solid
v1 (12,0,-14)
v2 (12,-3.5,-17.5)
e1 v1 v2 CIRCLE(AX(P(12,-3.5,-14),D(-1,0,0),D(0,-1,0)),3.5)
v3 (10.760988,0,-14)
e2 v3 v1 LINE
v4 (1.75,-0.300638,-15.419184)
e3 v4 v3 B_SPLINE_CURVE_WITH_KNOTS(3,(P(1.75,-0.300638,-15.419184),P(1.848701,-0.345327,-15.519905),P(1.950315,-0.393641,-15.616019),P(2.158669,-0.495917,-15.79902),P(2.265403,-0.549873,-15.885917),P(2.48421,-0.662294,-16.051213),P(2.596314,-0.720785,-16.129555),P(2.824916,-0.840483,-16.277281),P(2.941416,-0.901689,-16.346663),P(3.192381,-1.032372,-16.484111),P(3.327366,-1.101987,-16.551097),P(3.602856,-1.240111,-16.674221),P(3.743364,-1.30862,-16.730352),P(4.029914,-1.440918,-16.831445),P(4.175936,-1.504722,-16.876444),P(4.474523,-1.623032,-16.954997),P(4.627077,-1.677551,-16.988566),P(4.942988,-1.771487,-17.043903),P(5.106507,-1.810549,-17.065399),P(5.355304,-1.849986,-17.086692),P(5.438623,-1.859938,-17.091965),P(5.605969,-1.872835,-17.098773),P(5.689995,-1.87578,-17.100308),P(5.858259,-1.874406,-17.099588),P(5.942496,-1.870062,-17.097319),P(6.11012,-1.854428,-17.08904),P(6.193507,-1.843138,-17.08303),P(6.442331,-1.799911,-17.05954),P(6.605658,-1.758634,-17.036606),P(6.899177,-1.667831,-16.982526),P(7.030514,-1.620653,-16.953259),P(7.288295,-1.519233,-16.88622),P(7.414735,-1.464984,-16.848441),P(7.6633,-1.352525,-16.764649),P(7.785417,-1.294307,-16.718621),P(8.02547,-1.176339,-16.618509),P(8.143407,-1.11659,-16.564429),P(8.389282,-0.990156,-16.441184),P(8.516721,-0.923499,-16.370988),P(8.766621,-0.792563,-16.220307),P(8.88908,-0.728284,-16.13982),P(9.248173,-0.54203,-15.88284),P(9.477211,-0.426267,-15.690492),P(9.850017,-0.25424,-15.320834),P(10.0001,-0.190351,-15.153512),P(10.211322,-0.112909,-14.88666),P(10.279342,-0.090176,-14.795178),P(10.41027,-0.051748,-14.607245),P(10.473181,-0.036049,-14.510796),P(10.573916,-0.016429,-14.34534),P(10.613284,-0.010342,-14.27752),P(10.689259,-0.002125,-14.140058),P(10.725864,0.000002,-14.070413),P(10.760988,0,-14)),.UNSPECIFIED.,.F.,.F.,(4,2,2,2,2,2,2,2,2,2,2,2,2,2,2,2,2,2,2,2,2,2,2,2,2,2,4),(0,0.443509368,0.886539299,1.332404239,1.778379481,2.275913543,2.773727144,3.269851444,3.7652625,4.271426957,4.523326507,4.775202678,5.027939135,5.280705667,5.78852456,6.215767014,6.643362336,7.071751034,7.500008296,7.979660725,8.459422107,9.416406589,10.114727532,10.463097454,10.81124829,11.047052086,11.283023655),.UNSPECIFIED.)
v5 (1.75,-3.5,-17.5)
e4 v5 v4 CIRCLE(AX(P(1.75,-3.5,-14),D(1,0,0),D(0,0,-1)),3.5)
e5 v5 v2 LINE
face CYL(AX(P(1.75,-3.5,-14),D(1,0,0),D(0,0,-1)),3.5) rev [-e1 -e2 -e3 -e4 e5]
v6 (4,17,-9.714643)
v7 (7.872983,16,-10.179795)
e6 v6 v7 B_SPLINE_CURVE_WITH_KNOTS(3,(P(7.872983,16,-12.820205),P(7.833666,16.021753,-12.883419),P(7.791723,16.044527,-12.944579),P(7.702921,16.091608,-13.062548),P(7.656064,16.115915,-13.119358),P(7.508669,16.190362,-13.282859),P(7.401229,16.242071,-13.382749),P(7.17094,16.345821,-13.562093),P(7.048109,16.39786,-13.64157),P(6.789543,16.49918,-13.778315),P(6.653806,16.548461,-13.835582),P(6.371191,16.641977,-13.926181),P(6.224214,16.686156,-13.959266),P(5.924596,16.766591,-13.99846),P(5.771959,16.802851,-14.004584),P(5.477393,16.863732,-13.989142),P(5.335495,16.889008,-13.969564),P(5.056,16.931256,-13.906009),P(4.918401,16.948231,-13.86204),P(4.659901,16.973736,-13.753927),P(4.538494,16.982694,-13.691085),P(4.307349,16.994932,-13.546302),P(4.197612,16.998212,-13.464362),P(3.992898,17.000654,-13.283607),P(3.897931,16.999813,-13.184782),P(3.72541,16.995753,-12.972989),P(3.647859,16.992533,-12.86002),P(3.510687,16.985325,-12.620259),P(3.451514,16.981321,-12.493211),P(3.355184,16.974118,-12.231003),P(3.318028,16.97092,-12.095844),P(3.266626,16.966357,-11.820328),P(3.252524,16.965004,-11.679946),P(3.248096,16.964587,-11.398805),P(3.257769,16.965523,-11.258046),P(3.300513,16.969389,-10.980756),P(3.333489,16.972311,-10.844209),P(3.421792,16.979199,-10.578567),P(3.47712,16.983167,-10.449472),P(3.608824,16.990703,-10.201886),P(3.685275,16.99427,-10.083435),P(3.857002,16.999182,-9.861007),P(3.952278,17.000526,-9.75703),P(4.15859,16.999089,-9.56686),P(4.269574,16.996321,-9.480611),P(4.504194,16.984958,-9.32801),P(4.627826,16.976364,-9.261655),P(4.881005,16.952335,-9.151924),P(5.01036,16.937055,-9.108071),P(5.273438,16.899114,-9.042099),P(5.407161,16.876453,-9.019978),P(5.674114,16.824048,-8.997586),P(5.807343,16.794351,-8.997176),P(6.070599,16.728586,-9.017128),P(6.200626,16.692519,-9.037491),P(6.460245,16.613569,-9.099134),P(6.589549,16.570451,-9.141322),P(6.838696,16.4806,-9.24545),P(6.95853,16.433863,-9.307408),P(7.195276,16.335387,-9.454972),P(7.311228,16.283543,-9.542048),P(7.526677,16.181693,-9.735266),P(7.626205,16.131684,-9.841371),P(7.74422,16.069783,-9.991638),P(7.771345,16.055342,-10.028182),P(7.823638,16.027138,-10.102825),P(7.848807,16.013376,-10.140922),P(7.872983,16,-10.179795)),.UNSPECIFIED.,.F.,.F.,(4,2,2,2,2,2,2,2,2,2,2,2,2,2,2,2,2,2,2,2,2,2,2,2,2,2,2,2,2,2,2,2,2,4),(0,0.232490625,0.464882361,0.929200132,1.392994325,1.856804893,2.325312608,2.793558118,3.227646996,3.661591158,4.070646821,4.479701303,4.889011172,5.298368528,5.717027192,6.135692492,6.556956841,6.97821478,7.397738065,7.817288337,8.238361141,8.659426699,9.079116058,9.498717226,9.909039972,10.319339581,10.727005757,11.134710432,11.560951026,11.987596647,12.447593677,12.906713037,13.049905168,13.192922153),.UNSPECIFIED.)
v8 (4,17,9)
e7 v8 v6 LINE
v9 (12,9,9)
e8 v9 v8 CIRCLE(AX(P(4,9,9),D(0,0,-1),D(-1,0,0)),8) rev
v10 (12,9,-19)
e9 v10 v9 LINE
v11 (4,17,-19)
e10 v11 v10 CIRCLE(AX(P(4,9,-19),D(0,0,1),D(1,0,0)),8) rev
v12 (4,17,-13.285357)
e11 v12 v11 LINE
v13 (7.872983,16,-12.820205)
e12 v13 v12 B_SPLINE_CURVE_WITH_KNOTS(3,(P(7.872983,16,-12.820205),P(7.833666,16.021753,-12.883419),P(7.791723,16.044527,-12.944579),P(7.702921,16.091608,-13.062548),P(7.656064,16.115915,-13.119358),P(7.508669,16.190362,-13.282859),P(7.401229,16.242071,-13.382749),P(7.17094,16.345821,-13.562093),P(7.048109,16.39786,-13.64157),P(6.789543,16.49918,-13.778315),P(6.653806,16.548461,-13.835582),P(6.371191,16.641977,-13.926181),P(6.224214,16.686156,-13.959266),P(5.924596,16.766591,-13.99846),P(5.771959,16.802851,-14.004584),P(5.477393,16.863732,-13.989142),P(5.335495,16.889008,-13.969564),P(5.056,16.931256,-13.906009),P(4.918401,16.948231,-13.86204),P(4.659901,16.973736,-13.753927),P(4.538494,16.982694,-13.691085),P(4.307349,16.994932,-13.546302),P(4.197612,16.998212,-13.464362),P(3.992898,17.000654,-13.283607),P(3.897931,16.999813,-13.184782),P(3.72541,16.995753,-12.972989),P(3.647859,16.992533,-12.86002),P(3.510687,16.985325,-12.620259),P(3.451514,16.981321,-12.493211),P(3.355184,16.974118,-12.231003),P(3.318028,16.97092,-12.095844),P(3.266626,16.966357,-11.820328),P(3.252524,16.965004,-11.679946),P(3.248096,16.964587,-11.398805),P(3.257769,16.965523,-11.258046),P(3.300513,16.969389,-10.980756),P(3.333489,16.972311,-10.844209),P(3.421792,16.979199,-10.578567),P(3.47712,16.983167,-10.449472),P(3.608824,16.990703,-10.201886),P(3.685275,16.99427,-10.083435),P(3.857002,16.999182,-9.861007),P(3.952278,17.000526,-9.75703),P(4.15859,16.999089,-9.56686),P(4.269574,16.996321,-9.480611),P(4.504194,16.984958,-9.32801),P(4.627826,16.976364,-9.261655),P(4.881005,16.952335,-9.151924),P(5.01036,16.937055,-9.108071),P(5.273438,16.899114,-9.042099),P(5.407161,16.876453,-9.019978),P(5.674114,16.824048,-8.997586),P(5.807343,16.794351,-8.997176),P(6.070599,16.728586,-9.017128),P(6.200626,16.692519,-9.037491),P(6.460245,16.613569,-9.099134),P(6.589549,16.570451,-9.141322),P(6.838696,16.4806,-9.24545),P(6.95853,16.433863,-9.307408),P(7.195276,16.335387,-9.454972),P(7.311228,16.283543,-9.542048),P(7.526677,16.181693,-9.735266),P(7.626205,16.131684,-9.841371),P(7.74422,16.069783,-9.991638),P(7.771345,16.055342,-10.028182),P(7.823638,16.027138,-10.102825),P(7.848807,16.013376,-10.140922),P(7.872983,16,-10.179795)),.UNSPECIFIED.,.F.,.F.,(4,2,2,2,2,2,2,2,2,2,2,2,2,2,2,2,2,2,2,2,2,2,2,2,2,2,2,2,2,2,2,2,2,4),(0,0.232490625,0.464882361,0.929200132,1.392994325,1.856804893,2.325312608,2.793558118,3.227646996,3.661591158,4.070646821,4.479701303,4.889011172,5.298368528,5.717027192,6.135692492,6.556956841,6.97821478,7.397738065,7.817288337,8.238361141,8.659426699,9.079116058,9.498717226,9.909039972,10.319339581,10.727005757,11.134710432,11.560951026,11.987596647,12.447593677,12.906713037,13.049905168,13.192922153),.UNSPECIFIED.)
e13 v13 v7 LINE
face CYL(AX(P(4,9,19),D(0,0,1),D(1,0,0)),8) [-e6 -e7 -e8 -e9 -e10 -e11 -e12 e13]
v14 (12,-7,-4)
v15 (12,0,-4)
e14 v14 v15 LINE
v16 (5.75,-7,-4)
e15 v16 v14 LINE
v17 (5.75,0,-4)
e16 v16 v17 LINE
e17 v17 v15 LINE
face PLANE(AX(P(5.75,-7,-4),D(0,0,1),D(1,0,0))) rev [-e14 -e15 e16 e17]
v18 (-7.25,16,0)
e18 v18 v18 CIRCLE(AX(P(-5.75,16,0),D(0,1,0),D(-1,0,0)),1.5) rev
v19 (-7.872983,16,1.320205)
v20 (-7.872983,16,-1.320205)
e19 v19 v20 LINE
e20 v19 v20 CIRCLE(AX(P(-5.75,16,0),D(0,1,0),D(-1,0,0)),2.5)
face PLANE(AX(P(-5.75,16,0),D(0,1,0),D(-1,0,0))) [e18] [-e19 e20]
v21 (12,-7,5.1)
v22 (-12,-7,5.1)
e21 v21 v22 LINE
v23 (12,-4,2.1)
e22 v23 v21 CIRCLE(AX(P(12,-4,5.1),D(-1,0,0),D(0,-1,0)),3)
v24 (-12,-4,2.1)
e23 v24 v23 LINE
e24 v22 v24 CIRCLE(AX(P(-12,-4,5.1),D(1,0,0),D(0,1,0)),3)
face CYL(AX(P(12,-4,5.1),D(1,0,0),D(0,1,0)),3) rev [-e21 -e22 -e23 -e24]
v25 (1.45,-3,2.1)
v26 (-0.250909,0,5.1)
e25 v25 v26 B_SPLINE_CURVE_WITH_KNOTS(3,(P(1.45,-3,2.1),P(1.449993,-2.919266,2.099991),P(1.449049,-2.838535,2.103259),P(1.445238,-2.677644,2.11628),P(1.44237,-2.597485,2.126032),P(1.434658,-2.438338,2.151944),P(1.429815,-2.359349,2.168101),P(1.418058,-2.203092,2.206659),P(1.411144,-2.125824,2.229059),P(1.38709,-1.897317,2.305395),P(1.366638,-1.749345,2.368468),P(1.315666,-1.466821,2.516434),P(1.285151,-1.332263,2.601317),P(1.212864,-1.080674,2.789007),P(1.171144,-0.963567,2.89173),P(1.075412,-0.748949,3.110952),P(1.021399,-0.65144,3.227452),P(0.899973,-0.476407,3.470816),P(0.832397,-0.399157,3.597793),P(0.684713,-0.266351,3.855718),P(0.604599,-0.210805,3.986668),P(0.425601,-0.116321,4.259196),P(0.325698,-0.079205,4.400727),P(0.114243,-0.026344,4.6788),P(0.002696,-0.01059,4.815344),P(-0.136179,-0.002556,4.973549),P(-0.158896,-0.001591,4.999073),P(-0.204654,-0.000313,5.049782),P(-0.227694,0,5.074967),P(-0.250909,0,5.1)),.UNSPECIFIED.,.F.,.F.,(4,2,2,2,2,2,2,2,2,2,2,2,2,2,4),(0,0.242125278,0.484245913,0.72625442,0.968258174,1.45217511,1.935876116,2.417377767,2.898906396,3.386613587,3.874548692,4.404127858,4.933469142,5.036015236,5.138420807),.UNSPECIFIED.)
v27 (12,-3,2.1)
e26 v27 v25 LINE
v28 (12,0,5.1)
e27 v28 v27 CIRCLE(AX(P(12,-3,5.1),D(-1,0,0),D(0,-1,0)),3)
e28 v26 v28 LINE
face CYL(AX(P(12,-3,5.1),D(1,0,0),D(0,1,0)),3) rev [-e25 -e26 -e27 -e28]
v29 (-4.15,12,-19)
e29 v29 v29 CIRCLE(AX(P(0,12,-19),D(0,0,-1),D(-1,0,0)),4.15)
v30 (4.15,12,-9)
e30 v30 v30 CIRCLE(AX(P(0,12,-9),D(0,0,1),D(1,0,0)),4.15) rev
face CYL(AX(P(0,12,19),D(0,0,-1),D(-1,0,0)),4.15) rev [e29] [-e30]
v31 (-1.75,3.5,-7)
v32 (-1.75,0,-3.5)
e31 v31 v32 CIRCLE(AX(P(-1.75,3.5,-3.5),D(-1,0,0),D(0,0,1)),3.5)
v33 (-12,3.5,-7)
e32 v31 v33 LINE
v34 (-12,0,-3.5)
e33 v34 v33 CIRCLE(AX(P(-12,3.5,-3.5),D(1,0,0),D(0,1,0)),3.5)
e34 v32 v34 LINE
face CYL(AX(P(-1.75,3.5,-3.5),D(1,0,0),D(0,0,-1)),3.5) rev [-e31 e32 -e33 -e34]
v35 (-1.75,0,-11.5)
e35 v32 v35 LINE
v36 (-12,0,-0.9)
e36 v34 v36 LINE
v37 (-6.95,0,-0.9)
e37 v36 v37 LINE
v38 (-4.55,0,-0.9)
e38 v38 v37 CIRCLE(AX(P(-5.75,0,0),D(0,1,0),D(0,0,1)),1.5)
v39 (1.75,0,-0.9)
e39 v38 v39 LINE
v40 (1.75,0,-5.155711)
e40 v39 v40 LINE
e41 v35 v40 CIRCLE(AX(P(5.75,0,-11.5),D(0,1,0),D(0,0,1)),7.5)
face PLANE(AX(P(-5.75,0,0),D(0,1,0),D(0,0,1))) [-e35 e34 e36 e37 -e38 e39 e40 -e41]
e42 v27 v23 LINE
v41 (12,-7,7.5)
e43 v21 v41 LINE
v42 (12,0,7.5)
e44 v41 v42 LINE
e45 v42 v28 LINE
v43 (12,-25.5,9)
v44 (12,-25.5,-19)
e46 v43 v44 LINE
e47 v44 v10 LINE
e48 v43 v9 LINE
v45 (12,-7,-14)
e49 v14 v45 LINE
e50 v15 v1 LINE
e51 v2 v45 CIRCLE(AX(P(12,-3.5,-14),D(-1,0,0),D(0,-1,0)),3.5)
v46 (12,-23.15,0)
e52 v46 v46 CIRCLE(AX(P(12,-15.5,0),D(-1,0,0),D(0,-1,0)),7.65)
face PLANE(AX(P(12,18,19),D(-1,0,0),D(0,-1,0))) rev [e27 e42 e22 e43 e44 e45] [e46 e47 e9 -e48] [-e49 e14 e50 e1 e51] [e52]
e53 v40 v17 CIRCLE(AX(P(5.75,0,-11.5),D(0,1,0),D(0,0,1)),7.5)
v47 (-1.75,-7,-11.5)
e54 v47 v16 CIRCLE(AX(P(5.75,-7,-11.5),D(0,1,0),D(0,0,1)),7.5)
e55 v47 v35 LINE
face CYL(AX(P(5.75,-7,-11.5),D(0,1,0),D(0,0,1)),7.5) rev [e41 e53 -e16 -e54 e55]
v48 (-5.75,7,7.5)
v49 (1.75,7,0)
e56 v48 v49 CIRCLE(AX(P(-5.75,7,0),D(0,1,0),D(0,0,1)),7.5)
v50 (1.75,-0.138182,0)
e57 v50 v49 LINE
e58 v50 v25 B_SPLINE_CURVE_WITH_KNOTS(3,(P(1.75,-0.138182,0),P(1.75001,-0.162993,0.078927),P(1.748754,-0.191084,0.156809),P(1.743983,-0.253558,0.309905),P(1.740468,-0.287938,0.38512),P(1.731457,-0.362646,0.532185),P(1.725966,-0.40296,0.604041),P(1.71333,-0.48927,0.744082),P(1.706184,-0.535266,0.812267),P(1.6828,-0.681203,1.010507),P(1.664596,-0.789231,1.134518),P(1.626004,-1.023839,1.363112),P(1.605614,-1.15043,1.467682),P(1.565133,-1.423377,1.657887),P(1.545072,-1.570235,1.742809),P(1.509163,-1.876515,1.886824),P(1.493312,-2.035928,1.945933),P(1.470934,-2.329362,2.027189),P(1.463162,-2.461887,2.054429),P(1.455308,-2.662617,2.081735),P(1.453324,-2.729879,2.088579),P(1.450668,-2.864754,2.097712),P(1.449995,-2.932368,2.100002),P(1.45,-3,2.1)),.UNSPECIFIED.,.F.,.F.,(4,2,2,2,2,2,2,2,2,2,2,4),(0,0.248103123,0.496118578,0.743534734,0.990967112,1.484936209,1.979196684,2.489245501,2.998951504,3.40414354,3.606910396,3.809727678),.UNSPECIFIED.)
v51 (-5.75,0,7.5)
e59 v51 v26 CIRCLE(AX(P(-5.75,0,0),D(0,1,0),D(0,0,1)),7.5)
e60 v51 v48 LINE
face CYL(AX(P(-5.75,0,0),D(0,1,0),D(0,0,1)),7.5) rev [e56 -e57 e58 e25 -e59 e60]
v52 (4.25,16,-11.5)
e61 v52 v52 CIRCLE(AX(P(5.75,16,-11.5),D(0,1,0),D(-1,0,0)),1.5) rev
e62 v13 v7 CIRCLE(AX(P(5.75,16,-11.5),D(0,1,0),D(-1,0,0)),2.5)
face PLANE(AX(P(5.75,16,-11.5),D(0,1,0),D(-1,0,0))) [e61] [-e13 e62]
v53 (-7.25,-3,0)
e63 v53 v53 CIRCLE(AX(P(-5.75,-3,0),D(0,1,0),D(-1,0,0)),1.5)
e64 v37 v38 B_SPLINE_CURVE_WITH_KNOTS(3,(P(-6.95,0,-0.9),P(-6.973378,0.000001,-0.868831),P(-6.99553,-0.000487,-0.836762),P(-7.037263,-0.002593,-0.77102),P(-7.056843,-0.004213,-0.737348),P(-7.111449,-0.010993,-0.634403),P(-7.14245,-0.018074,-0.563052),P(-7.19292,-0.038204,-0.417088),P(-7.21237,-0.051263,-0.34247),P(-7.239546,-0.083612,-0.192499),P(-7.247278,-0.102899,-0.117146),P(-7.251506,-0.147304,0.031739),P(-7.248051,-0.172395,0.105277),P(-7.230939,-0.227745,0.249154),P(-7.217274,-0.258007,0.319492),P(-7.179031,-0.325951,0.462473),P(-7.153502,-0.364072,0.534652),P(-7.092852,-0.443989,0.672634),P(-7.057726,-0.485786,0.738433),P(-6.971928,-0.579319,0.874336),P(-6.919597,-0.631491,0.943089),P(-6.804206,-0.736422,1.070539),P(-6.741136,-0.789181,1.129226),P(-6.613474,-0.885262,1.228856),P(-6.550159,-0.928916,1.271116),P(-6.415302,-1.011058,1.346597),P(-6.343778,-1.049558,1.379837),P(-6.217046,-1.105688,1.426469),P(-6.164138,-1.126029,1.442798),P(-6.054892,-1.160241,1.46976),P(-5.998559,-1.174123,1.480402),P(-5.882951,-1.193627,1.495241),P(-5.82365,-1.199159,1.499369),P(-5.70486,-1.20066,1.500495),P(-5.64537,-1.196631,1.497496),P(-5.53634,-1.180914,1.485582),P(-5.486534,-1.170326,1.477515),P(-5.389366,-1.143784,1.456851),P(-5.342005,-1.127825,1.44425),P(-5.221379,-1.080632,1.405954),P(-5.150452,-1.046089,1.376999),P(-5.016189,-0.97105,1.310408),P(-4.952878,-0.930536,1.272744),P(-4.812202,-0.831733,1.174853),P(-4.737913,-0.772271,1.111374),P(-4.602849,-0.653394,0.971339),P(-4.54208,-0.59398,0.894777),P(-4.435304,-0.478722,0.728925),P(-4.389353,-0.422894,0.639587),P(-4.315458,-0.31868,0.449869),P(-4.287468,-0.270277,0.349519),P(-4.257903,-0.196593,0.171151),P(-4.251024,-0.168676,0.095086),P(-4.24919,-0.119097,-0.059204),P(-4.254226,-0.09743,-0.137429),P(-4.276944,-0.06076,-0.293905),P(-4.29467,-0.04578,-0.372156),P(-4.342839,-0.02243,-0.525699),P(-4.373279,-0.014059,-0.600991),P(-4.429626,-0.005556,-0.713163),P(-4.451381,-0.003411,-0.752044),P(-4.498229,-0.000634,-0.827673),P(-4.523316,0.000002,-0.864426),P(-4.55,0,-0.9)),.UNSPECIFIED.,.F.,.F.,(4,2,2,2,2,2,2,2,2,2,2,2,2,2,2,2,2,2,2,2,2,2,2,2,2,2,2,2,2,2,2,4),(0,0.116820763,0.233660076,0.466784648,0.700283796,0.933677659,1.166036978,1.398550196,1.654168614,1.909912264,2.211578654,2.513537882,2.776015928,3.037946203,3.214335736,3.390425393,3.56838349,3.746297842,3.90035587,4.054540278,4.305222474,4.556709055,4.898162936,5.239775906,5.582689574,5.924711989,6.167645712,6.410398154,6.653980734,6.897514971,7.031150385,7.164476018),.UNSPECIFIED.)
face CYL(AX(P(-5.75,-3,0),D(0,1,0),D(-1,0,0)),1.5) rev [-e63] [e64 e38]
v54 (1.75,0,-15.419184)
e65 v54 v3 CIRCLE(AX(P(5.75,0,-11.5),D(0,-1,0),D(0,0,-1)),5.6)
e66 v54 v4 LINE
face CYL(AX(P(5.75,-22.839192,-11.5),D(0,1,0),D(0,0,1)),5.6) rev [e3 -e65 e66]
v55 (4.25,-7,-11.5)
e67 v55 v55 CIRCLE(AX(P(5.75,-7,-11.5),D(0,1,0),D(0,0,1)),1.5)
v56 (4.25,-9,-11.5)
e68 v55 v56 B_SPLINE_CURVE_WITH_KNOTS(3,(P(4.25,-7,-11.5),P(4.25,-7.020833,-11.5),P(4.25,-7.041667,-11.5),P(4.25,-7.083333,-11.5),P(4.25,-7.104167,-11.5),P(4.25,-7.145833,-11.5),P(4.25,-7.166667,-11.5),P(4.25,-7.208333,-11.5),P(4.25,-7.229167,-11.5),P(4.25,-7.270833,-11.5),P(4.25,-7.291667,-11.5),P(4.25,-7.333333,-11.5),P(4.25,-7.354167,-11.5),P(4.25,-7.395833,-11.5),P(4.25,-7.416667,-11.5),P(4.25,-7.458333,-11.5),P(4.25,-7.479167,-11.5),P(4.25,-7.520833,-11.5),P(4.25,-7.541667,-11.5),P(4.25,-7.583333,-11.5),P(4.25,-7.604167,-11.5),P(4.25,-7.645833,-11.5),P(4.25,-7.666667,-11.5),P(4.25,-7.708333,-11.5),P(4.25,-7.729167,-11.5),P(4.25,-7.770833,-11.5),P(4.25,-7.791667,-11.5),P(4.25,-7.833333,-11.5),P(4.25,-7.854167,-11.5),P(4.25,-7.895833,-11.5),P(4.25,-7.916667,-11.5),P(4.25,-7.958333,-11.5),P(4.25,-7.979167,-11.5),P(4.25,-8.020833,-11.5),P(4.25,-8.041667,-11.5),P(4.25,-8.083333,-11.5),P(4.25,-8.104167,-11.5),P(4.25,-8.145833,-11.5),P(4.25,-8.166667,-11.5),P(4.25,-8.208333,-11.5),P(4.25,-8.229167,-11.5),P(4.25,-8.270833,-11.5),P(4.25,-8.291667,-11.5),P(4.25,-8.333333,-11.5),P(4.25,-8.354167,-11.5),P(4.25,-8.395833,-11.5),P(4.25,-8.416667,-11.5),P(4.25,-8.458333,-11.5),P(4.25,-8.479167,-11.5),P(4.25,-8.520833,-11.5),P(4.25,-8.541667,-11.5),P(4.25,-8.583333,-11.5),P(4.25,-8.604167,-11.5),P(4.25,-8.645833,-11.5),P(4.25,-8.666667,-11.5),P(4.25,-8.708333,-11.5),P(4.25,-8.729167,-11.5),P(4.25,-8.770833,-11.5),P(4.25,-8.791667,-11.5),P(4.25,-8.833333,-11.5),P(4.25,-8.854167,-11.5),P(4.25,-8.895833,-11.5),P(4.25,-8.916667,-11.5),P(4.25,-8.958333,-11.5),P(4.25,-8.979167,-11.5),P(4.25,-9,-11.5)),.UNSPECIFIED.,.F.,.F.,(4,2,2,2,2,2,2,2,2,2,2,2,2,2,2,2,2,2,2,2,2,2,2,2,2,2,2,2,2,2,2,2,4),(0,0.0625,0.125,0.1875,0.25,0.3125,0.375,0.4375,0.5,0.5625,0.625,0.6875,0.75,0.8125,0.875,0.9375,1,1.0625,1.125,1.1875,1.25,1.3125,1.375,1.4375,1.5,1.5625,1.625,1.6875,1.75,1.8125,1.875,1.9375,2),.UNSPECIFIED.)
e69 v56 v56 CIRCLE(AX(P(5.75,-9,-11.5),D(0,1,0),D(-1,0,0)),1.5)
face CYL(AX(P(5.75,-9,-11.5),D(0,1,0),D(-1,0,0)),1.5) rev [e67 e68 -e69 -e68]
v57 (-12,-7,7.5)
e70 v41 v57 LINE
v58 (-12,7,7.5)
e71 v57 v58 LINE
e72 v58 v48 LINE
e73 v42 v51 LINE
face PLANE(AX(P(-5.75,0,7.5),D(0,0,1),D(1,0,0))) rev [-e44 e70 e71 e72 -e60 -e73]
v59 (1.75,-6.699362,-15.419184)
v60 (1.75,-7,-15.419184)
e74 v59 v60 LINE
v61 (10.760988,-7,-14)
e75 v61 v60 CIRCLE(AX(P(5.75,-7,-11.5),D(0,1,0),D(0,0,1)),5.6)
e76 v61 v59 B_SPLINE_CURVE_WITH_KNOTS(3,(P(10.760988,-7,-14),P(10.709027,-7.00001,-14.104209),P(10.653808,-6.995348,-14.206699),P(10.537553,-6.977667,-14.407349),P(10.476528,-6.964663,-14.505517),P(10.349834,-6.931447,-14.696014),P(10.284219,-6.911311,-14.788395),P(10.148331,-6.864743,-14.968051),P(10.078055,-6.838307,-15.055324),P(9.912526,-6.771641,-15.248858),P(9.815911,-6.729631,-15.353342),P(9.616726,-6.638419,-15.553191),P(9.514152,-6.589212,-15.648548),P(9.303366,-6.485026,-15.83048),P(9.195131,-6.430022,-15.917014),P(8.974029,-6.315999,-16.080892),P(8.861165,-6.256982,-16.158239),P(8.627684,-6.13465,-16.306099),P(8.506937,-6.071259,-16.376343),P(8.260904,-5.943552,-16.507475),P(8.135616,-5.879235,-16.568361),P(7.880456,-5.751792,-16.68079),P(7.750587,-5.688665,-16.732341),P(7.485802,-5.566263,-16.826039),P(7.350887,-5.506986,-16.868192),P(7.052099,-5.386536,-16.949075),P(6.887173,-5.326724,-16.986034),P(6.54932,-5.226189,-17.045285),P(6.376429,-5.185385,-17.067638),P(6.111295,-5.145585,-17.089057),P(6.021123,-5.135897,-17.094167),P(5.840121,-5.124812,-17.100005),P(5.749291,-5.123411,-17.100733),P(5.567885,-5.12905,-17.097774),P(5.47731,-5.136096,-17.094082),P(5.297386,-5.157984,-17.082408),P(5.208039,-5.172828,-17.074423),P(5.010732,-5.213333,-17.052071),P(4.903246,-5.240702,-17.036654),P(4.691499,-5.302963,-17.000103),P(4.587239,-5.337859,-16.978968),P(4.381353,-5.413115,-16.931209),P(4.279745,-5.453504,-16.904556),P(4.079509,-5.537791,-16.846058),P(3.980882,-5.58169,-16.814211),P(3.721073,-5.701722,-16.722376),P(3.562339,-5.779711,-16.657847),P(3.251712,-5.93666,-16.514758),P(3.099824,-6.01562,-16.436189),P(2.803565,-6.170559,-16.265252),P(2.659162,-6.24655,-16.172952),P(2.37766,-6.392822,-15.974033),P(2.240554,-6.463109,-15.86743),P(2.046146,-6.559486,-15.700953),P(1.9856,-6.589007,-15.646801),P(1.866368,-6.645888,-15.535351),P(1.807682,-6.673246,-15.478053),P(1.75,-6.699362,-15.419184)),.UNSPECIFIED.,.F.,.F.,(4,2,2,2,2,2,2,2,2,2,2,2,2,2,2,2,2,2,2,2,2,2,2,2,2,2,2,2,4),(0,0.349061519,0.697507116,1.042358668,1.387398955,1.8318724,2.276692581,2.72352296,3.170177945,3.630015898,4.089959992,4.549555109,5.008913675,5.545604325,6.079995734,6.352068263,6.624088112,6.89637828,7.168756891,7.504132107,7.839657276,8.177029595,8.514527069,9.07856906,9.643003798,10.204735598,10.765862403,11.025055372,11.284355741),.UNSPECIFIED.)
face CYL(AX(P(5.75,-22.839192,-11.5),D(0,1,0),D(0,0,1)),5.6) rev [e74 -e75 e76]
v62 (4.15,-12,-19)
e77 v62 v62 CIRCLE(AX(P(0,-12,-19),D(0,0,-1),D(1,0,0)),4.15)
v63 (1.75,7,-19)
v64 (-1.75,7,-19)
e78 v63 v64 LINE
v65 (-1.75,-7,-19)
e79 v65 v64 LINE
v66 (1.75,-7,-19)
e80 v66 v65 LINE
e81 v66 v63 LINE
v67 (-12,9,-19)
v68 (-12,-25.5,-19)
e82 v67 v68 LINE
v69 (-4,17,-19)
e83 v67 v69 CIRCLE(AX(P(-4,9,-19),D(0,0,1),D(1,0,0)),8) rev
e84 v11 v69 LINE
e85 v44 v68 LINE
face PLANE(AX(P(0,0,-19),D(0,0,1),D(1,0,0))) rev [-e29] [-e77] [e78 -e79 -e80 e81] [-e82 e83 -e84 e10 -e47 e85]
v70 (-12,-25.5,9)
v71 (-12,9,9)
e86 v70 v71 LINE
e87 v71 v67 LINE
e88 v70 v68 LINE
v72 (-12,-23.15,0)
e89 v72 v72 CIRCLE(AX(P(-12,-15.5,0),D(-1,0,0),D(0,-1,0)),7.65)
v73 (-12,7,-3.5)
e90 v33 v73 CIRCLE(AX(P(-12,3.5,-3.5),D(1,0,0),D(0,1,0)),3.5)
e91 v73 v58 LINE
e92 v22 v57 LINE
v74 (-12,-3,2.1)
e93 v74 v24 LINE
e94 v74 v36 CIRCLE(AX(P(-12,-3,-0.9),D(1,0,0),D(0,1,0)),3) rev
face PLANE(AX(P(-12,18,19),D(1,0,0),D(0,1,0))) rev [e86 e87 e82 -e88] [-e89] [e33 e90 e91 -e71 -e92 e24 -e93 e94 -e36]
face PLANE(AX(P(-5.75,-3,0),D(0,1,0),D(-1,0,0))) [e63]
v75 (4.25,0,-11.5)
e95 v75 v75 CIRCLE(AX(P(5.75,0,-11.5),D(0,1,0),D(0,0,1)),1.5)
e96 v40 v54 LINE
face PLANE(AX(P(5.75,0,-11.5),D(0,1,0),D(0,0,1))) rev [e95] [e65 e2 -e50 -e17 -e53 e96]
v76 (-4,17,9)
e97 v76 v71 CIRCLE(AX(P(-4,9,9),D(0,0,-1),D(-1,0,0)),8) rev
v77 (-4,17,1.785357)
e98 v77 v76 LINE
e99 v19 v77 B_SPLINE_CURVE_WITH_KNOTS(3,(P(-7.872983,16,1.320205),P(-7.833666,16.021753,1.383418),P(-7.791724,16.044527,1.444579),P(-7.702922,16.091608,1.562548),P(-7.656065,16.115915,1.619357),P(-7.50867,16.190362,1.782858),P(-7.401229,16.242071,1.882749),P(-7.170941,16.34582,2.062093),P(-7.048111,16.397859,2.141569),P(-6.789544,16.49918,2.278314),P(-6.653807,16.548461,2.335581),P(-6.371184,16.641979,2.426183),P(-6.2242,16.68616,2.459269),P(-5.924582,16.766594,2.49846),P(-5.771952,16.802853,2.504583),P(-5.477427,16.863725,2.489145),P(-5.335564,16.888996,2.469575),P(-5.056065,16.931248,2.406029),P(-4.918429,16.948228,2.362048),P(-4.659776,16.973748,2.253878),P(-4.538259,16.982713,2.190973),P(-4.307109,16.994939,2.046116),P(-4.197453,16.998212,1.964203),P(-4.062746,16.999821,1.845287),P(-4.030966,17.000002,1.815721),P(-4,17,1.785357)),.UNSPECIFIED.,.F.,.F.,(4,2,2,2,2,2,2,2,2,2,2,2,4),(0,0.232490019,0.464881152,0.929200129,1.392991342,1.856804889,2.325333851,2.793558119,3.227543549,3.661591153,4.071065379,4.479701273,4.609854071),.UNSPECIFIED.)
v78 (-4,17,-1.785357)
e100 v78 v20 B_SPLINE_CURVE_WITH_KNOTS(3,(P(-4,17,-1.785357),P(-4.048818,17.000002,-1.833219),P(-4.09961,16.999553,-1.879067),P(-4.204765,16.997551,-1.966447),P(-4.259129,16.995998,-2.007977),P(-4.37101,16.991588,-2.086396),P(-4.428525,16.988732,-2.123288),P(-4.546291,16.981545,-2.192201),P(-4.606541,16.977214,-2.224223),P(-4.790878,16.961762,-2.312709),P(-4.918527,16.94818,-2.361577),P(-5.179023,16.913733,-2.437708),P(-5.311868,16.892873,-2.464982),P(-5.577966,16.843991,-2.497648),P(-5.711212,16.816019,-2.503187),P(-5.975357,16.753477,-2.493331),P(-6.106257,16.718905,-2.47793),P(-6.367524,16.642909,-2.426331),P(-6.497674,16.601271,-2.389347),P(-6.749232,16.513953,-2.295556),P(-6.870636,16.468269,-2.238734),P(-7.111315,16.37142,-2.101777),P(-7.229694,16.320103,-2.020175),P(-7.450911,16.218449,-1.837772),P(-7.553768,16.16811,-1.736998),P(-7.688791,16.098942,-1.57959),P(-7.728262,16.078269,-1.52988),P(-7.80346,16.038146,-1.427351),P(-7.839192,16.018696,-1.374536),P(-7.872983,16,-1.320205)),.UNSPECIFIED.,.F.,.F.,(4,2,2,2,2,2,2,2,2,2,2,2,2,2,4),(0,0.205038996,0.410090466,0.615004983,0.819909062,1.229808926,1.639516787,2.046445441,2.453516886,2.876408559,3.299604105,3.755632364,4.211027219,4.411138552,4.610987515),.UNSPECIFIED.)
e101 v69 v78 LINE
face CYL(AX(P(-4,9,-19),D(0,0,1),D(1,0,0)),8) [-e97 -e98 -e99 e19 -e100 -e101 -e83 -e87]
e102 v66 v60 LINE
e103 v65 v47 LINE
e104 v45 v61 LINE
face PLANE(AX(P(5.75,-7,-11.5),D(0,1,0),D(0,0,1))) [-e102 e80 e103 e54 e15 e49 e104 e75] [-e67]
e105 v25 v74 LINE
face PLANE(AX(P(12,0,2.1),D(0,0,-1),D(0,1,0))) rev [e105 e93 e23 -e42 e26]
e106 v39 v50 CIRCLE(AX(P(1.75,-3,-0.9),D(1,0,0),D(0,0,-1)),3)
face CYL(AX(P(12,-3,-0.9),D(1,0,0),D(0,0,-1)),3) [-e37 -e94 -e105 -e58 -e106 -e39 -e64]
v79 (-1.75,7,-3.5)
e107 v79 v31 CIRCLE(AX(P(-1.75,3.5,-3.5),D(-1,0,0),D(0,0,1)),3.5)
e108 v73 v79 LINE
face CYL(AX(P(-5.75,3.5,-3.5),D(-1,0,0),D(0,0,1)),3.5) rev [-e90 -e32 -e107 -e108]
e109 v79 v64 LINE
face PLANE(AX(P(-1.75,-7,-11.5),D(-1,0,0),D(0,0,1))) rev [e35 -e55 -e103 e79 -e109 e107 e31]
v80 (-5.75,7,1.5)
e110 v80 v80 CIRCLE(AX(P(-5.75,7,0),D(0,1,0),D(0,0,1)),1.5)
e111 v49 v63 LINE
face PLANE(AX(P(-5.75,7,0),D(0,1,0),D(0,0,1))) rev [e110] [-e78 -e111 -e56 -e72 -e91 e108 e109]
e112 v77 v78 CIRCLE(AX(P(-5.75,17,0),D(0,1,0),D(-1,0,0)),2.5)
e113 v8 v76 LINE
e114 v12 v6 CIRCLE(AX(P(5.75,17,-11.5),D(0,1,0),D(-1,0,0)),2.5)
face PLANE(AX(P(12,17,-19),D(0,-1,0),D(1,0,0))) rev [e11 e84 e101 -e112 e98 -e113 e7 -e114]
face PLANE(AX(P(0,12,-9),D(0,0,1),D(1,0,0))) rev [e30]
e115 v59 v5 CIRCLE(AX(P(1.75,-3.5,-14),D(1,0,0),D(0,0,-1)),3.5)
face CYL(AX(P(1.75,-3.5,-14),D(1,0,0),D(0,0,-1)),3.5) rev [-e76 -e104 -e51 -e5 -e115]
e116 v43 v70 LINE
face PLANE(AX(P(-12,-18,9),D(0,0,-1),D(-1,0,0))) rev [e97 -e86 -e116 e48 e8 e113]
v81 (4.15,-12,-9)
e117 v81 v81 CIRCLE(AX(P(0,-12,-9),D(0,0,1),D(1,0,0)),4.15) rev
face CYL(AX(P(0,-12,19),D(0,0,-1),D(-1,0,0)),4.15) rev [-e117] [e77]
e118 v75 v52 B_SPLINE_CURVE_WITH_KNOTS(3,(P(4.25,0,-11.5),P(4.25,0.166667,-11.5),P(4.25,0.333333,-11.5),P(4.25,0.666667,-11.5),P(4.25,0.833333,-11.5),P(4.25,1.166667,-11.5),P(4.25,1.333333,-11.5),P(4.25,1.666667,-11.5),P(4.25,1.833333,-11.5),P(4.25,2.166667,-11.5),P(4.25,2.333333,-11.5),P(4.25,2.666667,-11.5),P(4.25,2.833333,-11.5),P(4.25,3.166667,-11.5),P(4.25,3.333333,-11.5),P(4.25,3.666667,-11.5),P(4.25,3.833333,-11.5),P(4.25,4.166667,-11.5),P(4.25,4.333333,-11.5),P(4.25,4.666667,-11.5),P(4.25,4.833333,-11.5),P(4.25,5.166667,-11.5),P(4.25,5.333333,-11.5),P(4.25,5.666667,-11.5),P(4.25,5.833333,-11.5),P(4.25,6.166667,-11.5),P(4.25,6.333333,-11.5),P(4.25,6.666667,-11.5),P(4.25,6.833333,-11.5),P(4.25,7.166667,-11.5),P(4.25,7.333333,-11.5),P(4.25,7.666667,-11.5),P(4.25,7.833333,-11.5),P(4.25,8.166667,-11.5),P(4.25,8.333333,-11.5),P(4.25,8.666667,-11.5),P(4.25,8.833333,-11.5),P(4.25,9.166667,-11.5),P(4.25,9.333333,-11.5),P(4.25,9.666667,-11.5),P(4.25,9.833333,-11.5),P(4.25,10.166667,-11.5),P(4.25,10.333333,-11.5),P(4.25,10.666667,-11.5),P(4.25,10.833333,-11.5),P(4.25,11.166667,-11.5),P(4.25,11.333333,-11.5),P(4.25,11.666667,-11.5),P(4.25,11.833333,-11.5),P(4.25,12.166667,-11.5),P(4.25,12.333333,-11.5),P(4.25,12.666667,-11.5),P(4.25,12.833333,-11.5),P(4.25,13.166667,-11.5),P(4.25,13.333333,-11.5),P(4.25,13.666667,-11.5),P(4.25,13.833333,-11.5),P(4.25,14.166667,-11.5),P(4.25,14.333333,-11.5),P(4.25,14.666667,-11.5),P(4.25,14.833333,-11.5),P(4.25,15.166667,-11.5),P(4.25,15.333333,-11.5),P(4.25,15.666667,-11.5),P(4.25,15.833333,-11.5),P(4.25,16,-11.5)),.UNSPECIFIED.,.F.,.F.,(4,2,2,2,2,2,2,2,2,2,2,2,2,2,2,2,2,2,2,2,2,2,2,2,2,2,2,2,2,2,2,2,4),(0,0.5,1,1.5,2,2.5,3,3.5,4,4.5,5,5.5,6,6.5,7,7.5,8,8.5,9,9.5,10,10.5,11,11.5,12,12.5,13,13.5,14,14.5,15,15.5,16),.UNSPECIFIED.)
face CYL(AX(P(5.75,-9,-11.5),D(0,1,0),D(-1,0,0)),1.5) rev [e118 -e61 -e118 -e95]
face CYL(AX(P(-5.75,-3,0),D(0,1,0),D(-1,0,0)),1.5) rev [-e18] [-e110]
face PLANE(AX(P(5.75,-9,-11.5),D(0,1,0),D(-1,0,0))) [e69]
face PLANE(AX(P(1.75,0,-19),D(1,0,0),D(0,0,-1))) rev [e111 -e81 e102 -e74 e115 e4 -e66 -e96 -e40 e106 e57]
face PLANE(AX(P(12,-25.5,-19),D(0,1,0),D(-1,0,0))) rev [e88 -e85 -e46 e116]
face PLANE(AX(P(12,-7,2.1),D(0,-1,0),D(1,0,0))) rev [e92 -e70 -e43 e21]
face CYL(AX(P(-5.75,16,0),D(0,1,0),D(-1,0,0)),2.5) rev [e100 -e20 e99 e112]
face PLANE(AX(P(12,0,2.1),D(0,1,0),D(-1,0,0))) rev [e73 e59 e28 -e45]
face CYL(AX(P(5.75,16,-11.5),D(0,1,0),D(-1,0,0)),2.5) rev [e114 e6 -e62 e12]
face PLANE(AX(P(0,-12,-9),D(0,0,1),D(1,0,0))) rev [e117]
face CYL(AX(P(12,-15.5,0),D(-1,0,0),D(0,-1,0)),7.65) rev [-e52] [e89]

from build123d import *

# Parameters (mm, degrees)
SKETCH_1_W           = 24
SKETCH_1_H           = 36
EXTRUDE_1_DEPTH      = 19
CUT_EXTRUDE_2_DEPTH  = 3.5
SKETCH_4_W           = 5.4
SKETCH_4_H           = 7
CUT_EXTRUDE_3_DEPTH  = 36.510561809
CUT_EXTRUDE_4_DEPTH  = 3.5
SKETCH_6_R           = 4.15
CUT_EXTRUDE_5_DEPTH  = 44.726422218
FILLET_2_R           = 3
SKETCH_10_W          = 10
SKETCH_10_H          = 36
CUT_EXTRUDE_9_DEPTH  = 36.510561809
SKETCH_11_W          = 28
SKETCH_11_H          = 16.5
EXTRUDE_3_DEPTH      = 24
SKETCH_12_W          = 10.25
SKETCH_12_H          = 12
EXTRUDE_4_DEPTH      = 7
FILLET_3_R           = 3.5
SKETCH_13_W          = 10.25
SKETCH_13_H          = 1.5
EXTRUDE_5_DEPTH      = 7
FILLET_4_R           = 3.5
SKETCH_14_R          = 5.6
CUT_EXTRUDE_10_DEPTH = 7
FILLET_6_R           = 3
EXTRUDE_START        = -18
SKETCH_16_R          = 4.15
EXTRUDE_6_DEPTH      = 18
SKETCH_18_R          = 7.65
SKETCH_18_W          = 28
SKETCH_18_H          = 9
SKETCH_18_H_2        = 17.5
CUT_EXTRUDE_11_DEPTH = 47.122120558
FILLET_7_R           = 8
SKETCH_19_R          = 1.5
CUT_EXTRUDE_12_DEPTH = 26
SKETCH_20_R          = 1.5
CUT_EXTRUDE_13_DEPTH = 20
SKETCH_21_R          = 2.5
CUT_EXTRUDE_14_DEPTH = 1


with BuildPart() as part:
    # 草图1 → 凸台-拉伸1 (new, symmetric)
    with BuildSketch(Plane.XY):
        Rectangle(SKETCH_1_W, SKETCH_1_H)
    extrude(amount=EXTRUDE_1_DEPTH, both=True)

    # 草图3 → 切除-拉伸2 (cut, symmetric)
    with BuildSketch(Plane(origin=(0, 3.5, 0), x_dir=(1, 0, 0), z_dir=(0, 1, 0))):
        with BuildLine():
            Line((-5.75, -7.5), (-12, -7.5))
            Line((-12, -7.5), (-12, 19))
            Line((-12, 19), (1.75, 19))
            Line((1.75, 19), (1.75, 0))
            ThreePointArc((1.75, 0), (-0.446699141, -5.303300859), (-5.75, -7.5))
        make_face()
    extrude(amount=CUT_EXTRUDE_2_DEPTH, both=True, mode=Mode.SUBTRACT)

    # 草图4 → 切除-拉伸3 (cut, through all)
    with BuildSketch(Plane.ZY.offset(12)):
        with Locations((4.8, -3.5)):
            Rectangle(SKETCH_4_W, SKETCH_4_H)
    extrude(amount=-CUT_EXTRUDE_3_DEPTH, mode=Mode.SUBTRACT)

    # 草图5 → 切除-拉伸4 (cut, symmetric)
    with BuildSketch(Plane(origin=(0, -3.5, 0), x_dir=(1, 0, 0), z_dir=(0, 1, 0))):
        with BuildLine():
            Line((5.75, 4), (12, 4))
            Line((12, 4), (12, 19))
            Line((12, 19), (-1.75, 19))
            Line((-1.75, 19), (-1.75, 11.5))
            ThreePointArc((-1.75, 11.5), (0.446699141, 6.196699141), (5.75, 4))
        make_face()
    extrude(amount=CUT_EXTRUDE_4_DEPTH, both=True, mode=Mode.SUBTRACT)

    # 草图6 → 切除-拉伸5 (cut, through all)
    with BuildSketch(Plane(origin=(0, 0, -19), x_dir=(-1, 0, 0), z_dir=(0, 0, -1))):
        with Locations((0, 12)):
            Circle(SKETCH_6_R)
        with Locations(Location((0, -12, 0), (0, 0, 180))):
            Circle(SKETCH_6_R)
    extrude(amount=-CUT_EXTRUDE_5_DEPTH, mode=Mode.SUBTRACT)

    # 圆角2
    fillet_2_edges = [part.edges().sort_by_distance(p)[0] for p in [
        (6.725, 0, 2.1),
        (0, -7, 2.1),
    ]]
    fillet(fillet_2_edges, radius=FILLET_2_R)

    # 草图10 → 切除-拉伸9 (cut, through all)
    with BuildSketch(Plane(origin=(12, 0, 0), x_dir=(0, 0, -1), z_dir=(1, 0, 0))):
        with Locations((-14, 0)):
            Rectangle(SKETCH_10_W, SKETCH_10_H)
    extrude(amount=-CUT_EXTRUDE_9_DEPTH, mode=Mode.SUBTRACT)

    # 草图11 → 凸台-拉伸3 (add)
    with BuildSketch(Plane.ZY.offset(12)):
        with Locations((-5, -26.25)):
            Rectangle(SKETCH_11_W, SKETCH_11_H)
    extrude_3 = extrude(amount=-EXTRUDE_3_DEPTH)

    # 镜向2: 凸台-拉伸3 across plane
    add(extrude_3.mirror(Plane.ZX))

    # 草图12 → 凸台-拉伸4 (add)
    with BuildSketch(Plane(origin=(0, 0, 0), x_dir=(1, 0, 0), z_dir=(0, 1, 0))):
        with Locations((-6.875, 13)):
            Rectangle(SKETCH_12_W, SKETCH_12_H)
    extrude(amount=EXTRUDE_4_DEPTH)

    # 圆角3
    fillet_3_edges = [part.edges().sort_by_distance(p)[0] for p in [
        (-6.875, 0, -7),
        (-6.875, 7, -7),
    ]]
    fillet(fillet_3_edges, radius=FILLET_3_R - 0.0001)  # a hair under: the kernel refuses the full size

    # 草图13 → 凸台-拉伸5 (add)
    with BuildSketch(Plane.XZ):
        with Locations((6.875, -18.25)):
            Rectangle(SKETCH_13_W, SKETCH_13_H)
    extrude(amount=EXTRUDE_5_DEPTH)

    # 圆角4
    fillet_4_edges = [part.edges().sort_by_distance(p)[0] for p in [
        (6.875, 0, -17.5),
        (6.875, -7, -17.5),
    ]]
    fillet(fillet_4_edges, radius=FILLET_4_R - 0.0001)  # a hair under: the kernel refuses the full size

    # 草图14 → 切除-拉伸10 (cut)
    with BuildSketch(Plane.XZ):
        with Locations((5.75, -11.5)):
            Circle(SKETCH_14_R)
    extrude(amount=CUT_EXTRUDE_10_DEPTH, mode=Mode.SUBTRACT)

    # 圆角6
    fillet_6_edges = [part.edges().sort_by_distance(p)[0] for p in [
        (-5.275, 0, 2.1),
    ]]
    fillet(fillet_6_edges, radius=FILLET_6_R)

    # 草图16 → 凸台-拉伸6 (add)
    with BuildSketch(Plane.XY.offset(9).offset(EXTRUDE_START)):
        with Locations((0, -12)):
            Circle(SKETCH_16_R)
        with Locations(Location((0, 12, 0), (0, 0, 180))):
            Circle(SKETCH_16_R)
    extrude(amount=EXTRUDE_6_DEPTH)

    # 草图18 → 切除-拉伸11 (cut, through all)
    with BuildSketch(Plane.ZY.offset(12)):
        with Locations(Location((0, -15.5, 0), (0, 0, 270))):
            Circle(SKETCH_18_R)
        with Locations((-5, -30)):
            Rectangle(SKETCH_18_W, SKETCH_18_H)
        with Locations((-5, 25.75)):
            Rectangle(SKETCH_18_W, SKETCH_18_H_2)
    extrude(amount=-CUT_EXTRUDE_11_DEPTH, mode=Mode.SUBTRACT)

    # 圆角7
    fillet_7_edges = [part.edges().sort_by_distance(p)[0] for p in [
        (12, 17, -5),
        (-12, 17, -5),
    ]]
    fillet(fillet_7_edges, radius=FILLET_7_R)

    # 草图19 → 切除-拉伸12 (cut)
    with BuildSketch(Plane(origin=(0, 17, 0), x_dir=(1, 0, 0), z_dir=(0, 1, 0))):
        with Locations(Location((5.75, 11.5, 0), (0, 0, 180))):
            Circle(SKETCH_19_R)
    extrude(amount=-CUT_EXTRUDE_12_DEPTH, mode=Mode.SUBTRACT)

    # 草图20 → 切除-拉伸13 (cut)
    with BuildSketch(Plane(origin=(0, 17, 0), x_dir=(1, 0, 0), z_dir=(0, 1, 0))):
        with Locations(Location((-5.75, 0, 0), (0, 0, 180))):
            Circle(SKETCH_20_R)
    extrude(amount=-CUT_EXTRUDE_13_DEPTH, mode=Mode.SUBTRACT)

    # 草图21 → 切除-拉伸14 (cut)
    with BuildSketch(Plane(origin=(0, 17, 0), x_dir=(1, 0, 0), z_dir=(0, 1, 0))):
        with Locations((5.75, 11.5)):
            Circle(SKETCH_21_R)
        with Locations((-5.75, 0)):
            Circle(SKETCH_21_R)
    extrude(amount=-CUT_EXTRUDE_14_DEPTH, mode=Mode.SUBTRACT)


solid = part.part
